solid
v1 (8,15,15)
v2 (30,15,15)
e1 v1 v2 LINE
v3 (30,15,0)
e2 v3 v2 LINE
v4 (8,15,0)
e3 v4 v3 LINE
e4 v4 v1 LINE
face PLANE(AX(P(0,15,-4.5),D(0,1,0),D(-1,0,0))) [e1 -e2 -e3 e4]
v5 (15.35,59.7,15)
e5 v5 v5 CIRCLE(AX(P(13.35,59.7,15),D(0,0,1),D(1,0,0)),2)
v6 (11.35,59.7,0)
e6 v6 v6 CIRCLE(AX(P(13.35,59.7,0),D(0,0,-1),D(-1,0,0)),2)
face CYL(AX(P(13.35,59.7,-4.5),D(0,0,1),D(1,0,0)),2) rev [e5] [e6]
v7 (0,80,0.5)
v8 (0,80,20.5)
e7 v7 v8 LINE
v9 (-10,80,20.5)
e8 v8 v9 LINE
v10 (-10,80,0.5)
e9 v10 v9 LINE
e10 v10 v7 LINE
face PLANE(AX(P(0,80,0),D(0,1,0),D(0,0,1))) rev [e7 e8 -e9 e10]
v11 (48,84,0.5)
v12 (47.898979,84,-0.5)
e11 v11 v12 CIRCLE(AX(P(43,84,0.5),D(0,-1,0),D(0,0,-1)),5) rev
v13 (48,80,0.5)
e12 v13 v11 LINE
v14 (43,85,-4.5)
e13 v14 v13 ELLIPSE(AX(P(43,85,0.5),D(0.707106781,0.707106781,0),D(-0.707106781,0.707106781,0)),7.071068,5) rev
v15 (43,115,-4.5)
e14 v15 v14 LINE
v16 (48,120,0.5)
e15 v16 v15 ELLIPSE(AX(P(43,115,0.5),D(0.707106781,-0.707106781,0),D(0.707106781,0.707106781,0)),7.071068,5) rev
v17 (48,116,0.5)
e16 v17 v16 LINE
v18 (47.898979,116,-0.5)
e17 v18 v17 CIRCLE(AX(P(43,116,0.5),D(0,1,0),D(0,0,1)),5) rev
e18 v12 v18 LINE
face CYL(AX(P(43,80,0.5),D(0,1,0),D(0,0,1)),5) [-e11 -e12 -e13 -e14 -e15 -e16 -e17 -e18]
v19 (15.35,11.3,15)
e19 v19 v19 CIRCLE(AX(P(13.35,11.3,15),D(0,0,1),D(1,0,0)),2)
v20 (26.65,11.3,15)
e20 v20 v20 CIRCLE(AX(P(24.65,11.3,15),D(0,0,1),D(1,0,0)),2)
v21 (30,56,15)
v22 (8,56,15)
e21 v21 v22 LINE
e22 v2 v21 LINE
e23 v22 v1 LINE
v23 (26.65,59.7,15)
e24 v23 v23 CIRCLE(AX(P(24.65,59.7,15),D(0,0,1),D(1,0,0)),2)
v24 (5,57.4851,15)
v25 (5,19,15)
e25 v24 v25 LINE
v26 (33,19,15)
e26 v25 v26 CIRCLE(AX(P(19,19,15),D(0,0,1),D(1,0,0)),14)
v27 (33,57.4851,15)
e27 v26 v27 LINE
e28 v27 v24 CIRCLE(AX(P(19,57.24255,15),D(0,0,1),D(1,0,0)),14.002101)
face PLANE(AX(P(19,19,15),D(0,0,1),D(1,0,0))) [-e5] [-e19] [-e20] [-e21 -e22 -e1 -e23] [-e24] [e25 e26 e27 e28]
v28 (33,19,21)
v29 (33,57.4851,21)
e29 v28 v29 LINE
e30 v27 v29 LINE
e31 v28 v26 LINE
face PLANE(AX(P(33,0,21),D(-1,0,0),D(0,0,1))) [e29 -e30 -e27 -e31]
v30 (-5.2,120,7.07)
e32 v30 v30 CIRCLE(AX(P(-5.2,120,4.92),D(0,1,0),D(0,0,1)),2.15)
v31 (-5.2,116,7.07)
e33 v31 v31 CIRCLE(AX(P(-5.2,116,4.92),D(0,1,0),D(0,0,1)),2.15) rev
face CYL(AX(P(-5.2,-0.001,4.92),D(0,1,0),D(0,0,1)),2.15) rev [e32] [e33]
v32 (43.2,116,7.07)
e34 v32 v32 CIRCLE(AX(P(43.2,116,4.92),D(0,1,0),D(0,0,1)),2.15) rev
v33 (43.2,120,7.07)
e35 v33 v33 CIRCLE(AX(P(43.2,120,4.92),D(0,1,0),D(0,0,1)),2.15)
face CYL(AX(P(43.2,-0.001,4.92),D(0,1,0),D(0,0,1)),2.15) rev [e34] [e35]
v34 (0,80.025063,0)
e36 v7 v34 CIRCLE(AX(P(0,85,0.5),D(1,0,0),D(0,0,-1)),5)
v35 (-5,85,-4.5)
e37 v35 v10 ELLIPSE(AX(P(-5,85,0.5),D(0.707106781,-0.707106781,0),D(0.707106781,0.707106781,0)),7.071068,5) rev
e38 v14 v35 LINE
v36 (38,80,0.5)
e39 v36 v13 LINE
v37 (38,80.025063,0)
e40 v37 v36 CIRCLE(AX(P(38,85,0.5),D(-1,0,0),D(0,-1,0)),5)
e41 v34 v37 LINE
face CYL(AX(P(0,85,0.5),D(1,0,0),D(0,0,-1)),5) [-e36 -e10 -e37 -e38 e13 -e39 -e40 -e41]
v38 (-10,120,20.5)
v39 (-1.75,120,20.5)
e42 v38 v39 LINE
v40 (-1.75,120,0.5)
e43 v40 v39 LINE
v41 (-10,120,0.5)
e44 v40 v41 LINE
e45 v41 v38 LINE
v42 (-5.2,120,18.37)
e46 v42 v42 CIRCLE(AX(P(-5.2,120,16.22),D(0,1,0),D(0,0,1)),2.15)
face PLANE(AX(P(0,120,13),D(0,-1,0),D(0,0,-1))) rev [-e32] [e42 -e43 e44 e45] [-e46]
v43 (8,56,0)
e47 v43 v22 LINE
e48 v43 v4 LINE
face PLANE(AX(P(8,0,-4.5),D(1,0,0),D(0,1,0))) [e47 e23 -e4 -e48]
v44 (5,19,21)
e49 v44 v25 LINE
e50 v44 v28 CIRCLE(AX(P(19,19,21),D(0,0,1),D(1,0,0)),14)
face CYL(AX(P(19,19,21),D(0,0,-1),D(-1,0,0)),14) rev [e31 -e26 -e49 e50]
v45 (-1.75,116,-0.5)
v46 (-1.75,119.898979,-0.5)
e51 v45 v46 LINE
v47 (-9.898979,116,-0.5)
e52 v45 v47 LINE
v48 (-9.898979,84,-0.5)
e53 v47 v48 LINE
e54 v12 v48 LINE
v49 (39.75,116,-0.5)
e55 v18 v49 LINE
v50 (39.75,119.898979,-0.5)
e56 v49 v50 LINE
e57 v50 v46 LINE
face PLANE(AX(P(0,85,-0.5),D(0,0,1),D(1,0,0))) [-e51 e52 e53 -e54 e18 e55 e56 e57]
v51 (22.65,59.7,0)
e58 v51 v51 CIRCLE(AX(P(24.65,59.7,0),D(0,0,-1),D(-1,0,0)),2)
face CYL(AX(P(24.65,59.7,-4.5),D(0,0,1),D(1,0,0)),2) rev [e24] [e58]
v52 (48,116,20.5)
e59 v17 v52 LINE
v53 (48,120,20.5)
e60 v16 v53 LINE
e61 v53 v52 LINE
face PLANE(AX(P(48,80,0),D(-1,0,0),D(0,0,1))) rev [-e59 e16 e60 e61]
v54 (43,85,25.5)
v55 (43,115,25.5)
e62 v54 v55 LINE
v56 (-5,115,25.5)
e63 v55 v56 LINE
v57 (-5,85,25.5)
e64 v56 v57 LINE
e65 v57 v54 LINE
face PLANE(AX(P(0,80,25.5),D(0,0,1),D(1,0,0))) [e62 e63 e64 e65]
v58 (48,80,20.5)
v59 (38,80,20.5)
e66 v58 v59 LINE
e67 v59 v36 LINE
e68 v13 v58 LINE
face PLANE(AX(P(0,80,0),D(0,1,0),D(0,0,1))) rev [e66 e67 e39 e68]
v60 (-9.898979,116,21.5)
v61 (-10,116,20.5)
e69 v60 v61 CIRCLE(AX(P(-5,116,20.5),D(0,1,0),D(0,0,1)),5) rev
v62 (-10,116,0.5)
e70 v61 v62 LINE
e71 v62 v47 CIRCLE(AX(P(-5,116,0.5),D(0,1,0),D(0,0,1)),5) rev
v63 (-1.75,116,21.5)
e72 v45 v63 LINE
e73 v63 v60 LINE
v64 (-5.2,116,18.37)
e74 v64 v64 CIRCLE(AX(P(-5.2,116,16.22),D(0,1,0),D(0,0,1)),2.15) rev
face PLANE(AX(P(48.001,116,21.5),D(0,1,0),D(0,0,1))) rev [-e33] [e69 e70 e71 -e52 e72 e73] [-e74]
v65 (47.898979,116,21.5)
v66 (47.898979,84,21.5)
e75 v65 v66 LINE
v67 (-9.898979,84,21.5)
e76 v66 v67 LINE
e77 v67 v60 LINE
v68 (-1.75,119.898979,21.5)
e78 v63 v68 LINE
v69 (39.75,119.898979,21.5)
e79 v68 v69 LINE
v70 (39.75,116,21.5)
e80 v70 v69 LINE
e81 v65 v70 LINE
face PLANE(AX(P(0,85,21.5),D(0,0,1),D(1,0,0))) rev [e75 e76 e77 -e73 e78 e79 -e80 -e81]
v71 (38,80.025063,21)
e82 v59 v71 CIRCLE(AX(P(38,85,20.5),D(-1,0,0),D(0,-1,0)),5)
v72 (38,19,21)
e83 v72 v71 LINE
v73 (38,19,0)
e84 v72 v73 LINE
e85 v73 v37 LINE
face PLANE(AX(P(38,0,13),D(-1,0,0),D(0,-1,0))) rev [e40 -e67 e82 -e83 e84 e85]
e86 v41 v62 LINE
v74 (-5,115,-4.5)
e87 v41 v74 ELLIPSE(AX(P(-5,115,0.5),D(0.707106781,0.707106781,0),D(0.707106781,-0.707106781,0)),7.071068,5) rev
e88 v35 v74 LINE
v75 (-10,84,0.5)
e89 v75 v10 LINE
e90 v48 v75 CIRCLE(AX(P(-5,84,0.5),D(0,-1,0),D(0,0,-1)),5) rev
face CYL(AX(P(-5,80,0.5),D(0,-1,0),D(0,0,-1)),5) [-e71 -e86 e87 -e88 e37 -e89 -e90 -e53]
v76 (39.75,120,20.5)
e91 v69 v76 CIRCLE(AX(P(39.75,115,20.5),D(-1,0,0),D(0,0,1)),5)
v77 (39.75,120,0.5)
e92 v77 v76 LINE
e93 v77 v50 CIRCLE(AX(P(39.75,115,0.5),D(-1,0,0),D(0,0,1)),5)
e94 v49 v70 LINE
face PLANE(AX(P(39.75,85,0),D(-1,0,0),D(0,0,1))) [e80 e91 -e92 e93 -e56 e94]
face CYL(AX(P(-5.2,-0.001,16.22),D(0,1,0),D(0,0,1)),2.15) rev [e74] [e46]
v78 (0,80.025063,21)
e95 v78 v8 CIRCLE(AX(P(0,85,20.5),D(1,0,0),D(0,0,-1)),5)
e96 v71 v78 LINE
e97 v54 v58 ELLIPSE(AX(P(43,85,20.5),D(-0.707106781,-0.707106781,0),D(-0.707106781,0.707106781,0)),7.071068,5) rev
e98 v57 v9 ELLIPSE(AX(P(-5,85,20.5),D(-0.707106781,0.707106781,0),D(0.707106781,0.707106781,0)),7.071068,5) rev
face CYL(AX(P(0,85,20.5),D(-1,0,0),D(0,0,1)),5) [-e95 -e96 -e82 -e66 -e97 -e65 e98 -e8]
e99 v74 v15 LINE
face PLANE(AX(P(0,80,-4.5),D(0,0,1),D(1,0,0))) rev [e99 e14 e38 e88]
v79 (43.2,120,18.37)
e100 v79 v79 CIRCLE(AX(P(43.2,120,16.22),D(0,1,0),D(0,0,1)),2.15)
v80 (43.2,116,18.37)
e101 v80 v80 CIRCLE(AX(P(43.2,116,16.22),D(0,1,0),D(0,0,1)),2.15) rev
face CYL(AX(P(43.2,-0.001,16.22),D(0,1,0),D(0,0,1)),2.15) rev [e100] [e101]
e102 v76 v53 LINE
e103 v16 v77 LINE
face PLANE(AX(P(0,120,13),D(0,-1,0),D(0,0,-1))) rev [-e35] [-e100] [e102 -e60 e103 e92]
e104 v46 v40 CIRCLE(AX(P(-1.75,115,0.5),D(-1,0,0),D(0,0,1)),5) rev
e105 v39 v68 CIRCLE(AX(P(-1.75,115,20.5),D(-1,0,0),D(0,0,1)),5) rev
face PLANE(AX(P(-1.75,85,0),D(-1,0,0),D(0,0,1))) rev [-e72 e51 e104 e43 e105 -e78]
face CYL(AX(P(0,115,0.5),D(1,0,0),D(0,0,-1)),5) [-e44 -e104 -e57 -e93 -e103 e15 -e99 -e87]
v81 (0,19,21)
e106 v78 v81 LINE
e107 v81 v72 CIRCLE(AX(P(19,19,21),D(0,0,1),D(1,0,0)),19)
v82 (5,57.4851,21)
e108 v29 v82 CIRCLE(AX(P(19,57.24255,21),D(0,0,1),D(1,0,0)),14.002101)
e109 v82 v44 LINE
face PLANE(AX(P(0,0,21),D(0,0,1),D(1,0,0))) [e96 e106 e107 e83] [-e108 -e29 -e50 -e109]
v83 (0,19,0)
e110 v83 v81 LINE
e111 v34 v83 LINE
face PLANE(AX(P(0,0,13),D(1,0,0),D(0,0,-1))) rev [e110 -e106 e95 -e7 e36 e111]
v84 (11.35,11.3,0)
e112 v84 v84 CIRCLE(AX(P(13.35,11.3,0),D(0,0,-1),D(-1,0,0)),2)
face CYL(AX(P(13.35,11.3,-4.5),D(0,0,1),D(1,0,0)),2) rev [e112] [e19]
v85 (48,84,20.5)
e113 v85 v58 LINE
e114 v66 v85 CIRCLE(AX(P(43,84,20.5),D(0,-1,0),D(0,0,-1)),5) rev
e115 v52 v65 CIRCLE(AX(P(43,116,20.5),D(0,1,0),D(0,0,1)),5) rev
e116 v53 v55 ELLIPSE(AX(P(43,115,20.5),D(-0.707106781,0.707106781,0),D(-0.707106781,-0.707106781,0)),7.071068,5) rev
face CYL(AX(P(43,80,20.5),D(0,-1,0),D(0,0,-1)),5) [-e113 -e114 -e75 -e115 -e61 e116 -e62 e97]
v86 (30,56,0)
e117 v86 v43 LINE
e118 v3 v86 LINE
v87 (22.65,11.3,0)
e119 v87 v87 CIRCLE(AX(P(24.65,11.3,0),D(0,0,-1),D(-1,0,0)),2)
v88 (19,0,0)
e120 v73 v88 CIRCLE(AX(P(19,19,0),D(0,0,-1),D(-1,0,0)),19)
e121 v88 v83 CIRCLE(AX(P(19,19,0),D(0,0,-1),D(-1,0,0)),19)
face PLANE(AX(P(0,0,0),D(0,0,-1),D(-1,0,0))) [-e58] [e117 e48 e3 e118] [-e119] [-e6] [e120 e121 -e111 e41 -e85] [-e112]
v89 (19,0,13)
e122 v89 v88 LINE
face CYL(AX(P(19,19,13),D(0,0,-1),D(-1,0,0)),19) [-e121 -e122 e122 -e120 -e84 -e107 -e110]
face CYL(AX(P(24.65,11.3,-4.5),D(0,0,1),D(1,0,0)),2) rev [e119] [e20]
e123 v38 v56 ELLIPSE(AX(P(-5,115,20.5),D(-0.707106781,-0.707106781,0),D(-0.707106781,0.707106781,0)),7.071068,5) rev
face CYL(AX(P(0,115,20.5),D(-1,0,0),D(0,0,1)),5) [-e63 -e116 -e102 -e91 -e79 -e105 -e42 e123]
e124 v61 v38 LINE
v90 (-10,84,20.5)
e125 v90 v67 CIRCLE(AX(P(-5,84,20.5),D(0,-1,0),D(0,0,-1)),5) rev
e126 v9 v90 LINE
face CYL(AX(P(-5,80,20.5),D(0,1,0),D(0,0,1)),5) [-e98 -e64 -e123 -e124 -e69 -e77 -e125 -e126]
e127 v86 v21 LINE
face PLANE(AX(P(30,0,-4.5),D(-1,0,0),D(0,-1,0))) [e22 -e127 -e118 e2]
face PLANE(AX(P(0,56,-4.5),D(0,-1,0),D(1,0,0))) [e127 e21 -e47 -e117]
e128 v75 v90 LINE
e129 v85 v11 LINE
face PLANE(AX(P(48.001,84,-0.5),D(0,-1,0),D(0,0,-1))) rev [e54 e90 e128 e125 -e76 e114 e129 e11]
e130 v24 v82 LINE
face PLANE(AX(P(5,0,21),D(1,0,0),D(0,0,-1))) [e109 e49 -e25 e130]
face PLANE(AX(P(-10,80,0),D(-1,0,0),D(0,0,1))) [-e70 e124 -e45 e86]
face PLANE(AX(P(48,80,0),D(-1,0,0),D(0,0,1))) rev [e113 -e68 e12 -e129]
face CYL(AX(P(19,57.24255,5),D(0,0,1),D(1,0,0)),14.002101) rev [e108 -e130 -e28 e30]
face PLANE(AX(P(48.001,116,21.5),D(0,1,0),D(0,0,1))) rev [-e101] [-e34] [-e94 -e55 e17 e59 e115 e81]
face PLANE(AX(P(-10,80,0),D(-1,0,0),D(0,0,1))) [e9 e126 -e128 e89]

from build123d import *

# Parameters (mm, degrees)
SKETCH1_W                = 38
SKETCH1_H                = 120
BOSS_EXTRUDE1_DEPTH      = 13
FILLET1_R                = 19
SKETCH2_W                = 28
SKETCH2_H                = 43
BOSS_EXTRUDE2_DEPTH      = 8
SKETCH4_W                = 58
SKETCH4_H                = 30
BOSS_EXTRUDE3_DEPTH      = 40
SKETCH4_2_W              = 41.5
SKETCH4_2_H              = 22
SKETCH4_2_W_2            = 38
SKETCH4_2_H_2            = 21
CUT_EXTRUDE2_DEPTH       = 35
CUT_EXTRUDE3_REACH       = 137.699
SKETCH5_W                = 22
SKETCH5_H                = 32
CUT_EXTRUDE4_REACH       = 133.736
SKETCH7_R                = 2.15
FILLET2_R                = 5
CUT_EXTRUDE5_START       = -8
CUT_EXTRUDE5_DEPTH       = 8
BOSS_EXTRUDE4_DEPTH      = 8
SKETCH9_W                = 22
SKETCH9_H                = 41
CUT_EXTRUDE20_DEPTH      = 131.859657649
CUT_EXTRUDE22_DEPTH      = 131.859657649
CUT_EXTRUDE22_DEPTH_BACK = 131.859657649
SKETCH11_R               = 2
SKETCH11_W               = 22
SKETCH11_H               = 41
SKETCH12_R               = 2
SKETCH12_W               = 22
SKETCH12_H               = 41
BOSS_EXTRUDE6_DEPTH      = 10


# Some blends are built 0.0001 mm under size
with BuildPart() as part:
    # Sketch1 → Boss-Extrude1 (new body)
    with BuildSketch(Plane.XY):
        with Locations((19, 60)):
            Rectangle(SKETCH1_W, SKETCH1_H)
    extrude(amount=BOSS_EXTRUDE1_DEPTH)

    # Fillet1
    fillet1_edges = [part.edges().sort_by_distance(p)[0] for p in [
        (38, 0, 6.5),
        (0, 0, 6.5),
    ]]
    fillet(fillet1_edges, radius=FILLET1_R - 0.0001)  # a hair under: the kernel refuses the full size

    # Sketch2 → Boss-Extrude2 (add)
    with BuildSketch(Plane.XY.offset(13)):
        with BuildLine():
            Line((33, 72), (33, 19))
            ThreePointArc((33, 19), (28.899494937, 9.100505063), (19, 5))
            ThreePointArc((19, 5), (9.100505063, 9.100505063), (5, 19))
            Line((5, 19), (5, 72))
            Line((5, 72), (0, 72))
            Line((0, 72), (0, 19))
            ThreePointArc((0, 19), (5.564971157, 5.564971157), (19, 0))
            ThreePointArc((19, 0), (32.435028843, 5.564971157), (38, 19))
            Line((38, 19), (38, 72))
            Line((38, 72), (33, 72))
        make_face()
        Polygon((33, 115), (33, 72), (38, 72), (38, 120), (0, 120), (0, 72), (5, 72), (5, 115), align=None)
        with Locations((19, 93.5)):
            Rectangle(SKETCH2_W, SKETCH2_H)
    extrude(amount=BOSS_EXTRUDE2_DEPTH)

    # Sketch4 → Boss-Extrude3 (add)
    with BuildSketch(Plane(origin=(0, 120, 0), x_dir=(1, 0, 0), z_dir=(0, 1, 0))):
        with Locations((19, -10.5)):
            Rectangle(SKETCH4_W, SKETCH4_H)
    extrude(amount=-BOSS_EXTRUDE3_DEPTH)

    # Sketch4<2> → Cut-Extrude2 (cut)
    # profile 1 of 2: a face of its own
    with BuildSketch(Plane(origin=(0, 120, 0), x_dir=(1, 0, 0), z_dir=(0, 1, 0))):
        with Locations((19, -10.5)):
            Rectangle(SKETCH4_2_W, SKETCH4_2_H)
        with Locations((19, -10.5)):
            Rectangle(SKETCH4_2_W_2, SKETCH4_2_H_2, mode=Mode.SUBTRACT)
    # profile 2 of 2: a face of its own
    with BuildSketch(Plane(origin=(0, 120, 0), x_dir=(1, 0, 0), z_dir=(0, 1, 0))):
        with Locations((19, -10.5)):
            Rectangle(SKETCH4_2_W_2, SKETCH4_2_H_2)
    extrude(amount=-CUT_EXTRUDE2_DEPTH, mode=Mode.SUBTRACT)

    # Sketch5 → Cut-Extrude3 (cut, up to next)
    with BuildSketch(Plane.ZY.offset(10), mode=Mode.PRIVATE) as cut_extrude3_sk1:
        with Locations((10.5, 100)):
            Rectangle(SKETCH5_W, SKETCH5_H)
    cut_extrude3_tool1 = extrude(cut_extrude3_sk1.sketch, amount=-CUT_EXTRUDE3_REACH, mode=Mode.PRIVATE) & part.part
    add(cut_extrude3_tool1.solids().sort_by_distance((-10, 100, 10.5))[0], mode=Mode.SUBTRACT)

    # Sketch7 → Cut-Extrude4 (cut, up to next)
    with BuildSketch(Plane(origin=(0, 120, 0), x_dir=(1, 0, 0), z_dir=(0, 1, 0)), mode=Mode.PRIVATE) as cut_extrude4_sk1:
        with Locations(Location((-5.2, -4.92, 0), (0, 0, 270))):
            Circle(SKETCH7_R)
    cut_extrude4_tool1 = extrude(cut_extrude4_sk1.sketch, amount=-CUT_EXTRUDE4_REACH, mode=Mode.PRIVATE) & part.part
    # Sketch7 → Cut-Extrude4 (cut, up to next)
    with BuildSketch(Plane(origin=(0, 120, 0), x_dir=(1, 0, 0), z_dir=(0, 1, 0)), mode=Mode.PRIVATE) as cut_extrude4_sk2:
        with Locations(Location((-5.2, -16.22, 0), (0, 0, 270))):
            Circle(SKETCH7_R)
    cut_extrude4_tool2 = extrude(cut_extrude4_sk2.sketch, amount=-CUT_EXTRUDE4_REACH, mode=Mode.PRIVATE) & part.part
    # Sketch7 → Cut-Extrude4 (cut, up to next)
    with BuildSketch(Plane(origin=(0, 120, 0), x_dir=(1, 0, 0), z_dir=(0, 1, 0)), mode=Mode.PRIVATE) as cut_extrude4_sk3:
        with Locations(Location((43.2, -4.92, 0), (0, 0, 270))):
            Circle(SKETCH7_R)
    cut_extrude4_tool3 = extrude(cut_extrude4_sk3.sketch, amount=-CUT_EXTRUDE4_REACH, mode=Mode.PRIVATE) & part.part
    # Sketch7 → Cut-Extrude4 (cut, up to next)
    with BuildSketch(Plane(origin=(0, 120, 0), x_dir=(1, 0, 0), z_dir=(0, 1, 0)), mode=Mode.PRIVATE) as cut_extrude4_sk4:
        with Locations(Location((43.2, -16.22, 0), (0, 0, 270))):
            Circle(SKETCH7_R)
    cut_extrude4_tool4 = extrude(cut_extrude4_sk4.sketch, amount=-CUT_EXTRUDE4_REACH, mode=Mode.PRIVATE) & part.part
    # Sketch7 → Cut-Extrude4 (cut, up to next)
    with BuildSketch(Plane(origin=(0, 120, 0), x_dir=(1, 0, 0), z_dir=(0, 1, 0)), mode=Mode.PRIVATE) as cut_extrude4_sk5:
        with Locations(Location((-5.2, -4.92, 0), (0, 0, 270))):
            Circle(SKETCH7_R)
    cut_extrude4_tool5 = extrude(cut_extrude4_sk5.sketch, amount=-CUT_EXTRUDE4_REACH, mode=Mode.PRIVATE) & part.part
    add(cut_extrude4_tool1.solids().sort_by_distance((-5.2, 120, 4.92))[0], mode=Mode.SUBTRACT)
    add(cut_extrude4_tool2.solids().sort_by_distance((-5.2, 120, 16.22))[0], mode=Mode.SUBTRACT)
    add(cut_extrude4_tool3.solids().sort_by_distance((43.2, 120, 4.92))[0], mode=Mode.SUBTRACT)
    add(cut_extrude4_tool4.solids().sort_by_distance((43.2, 120, 16.22))[0], mode=Mode.SUBTRACT)
    add(cut_extrude4_tool5.solids().sort_by_distance((-5.2, 120, 4.92))[0], mode=Mode.SUBTRACT)

    # Fillet2
    # the kernel refuses this fillet: 5 mm, written as the material it takes off along each edge
    with BuildSketch(Plane(origin=(-10, 132.5, -4.5), x_dir=(1, 0, 0), z_dir=(0, -1, 0)), Plane(origin=(-10, 132.5, 25.5), x_dir=(0, 0, -1), z_dir=(0, -1, 0))) as fillet2_piece_1:
        with BuildLine():
            CenterArc((FILLET2_R, FILLET2_R), FILLET2_R, 180, 90)
            Line((0, FILLET2_R), (0, 0))
            Line((0, 0), (FILLET2_R, 0))
        make_face()
    extrude(amount=65, mode=Mode.SUBTRACT)
    with BuildSketch(Plane(origin=(-22.5, 120, -4.5), x_dir=(0, -1, 0), z_dir=(1, 0, 0)), Plane(origin=(60.5, 120, 25.5), x_dir=(0, -1, 0), z_dir=(-1, 0, 0))) as fillet2_piece_2:
        with BuildLine():
            CenterArc((FILLET2_R, -FILLET2_R), FILLET2_R, 90, 90)
            Line((0, -FILLET2_R), (0, 0))
            Line((0, 0), (FILLET2_R, 0))
        make_face()
    extrude(amount=83, mode=Mode.SUBTRACT)
    with BuildSketch(Plane(origin=(-22.5, 80, -4.5), x_dir=(0, 0, 1), z_dir=(1, 0, 0))) as fillet2_piece_3_section:
        with BuildLine():
            CenterArc((FILLET2_R, -FILLET2_R), FILLET2_R, 90, 90)
            Line((0, -FILLET2_R), (0, 0))
            Line((0, 0), (FILLET2_R, 0))
        make_face()
    fillet2_piece_3 = extrude(amount=83, mode=Mode.PRIVATE)
    fillet2_piece_3 = split(fillet2_piece_3, bisect_by=Plane(origin=(-11.25, 79.954430424, 0), z_dir=(0, 0, 1)), keep=Keep.TOP, mode=Mode.PRIVATE)
    fillet2_piece_3 = split(fillet2_piece_3, bisect_by=Plane(origin=(0, 79.954430424, 0.240366423), z_dir=(-1, 0, 0)), keep=Keep.TOP, mode=Mode.PRIVATE)
    add(fillet2_piece_3, mode=Mode.SUBTRACT)
    with BuildSketch(Plane(origin=(-22.5, 80, -4.5), x_dir=(0, 0, 1), z_dir=(1, 0, 0))) as fillet2_piece_4_section:
        with BuildLine():
            CenterArc((FILLET2_R, -FILLET2_R), FILLET2_R, 90, 90)
            Line((0, -FILLET2_R), (0, 0))
            Line((0, 0), (FILLET2_R, 0))
        make_face()
    fillet2_piece_4 = extrude(amount=83, mode=Mode.PRIVATE)
    fillet2_piece_4 = split(fillet2_piece_4, bisect_by=Plane(origin=(-11.25, 81.142067703, 0), z_dir=(0, 0, -1)), keep=Keep.TOP, mode=Mode.PRIVATE)
    fillet2_piece_4 = split(fillet2_piece_4, bisect_by=Plane(origin=(0, 81.142067703, -3.398950084), z_dir=(-1, 0, 0)), keep=Keep.TOP, mode=Mode.PRIVATE)
    add(fillet2_piece_4, mode=Mode.SUBTRACT)
    with BuildSketch(Plane(origin=(-22.5, 80, -4.5), x_dir=(0, 0, 1), z_dir=(1, 0, 0))) as fillet2_piece_5_section:
        with BuildLine():
            CenterArc((FILLET2_R, -FILLET2_R), FILLET2_R, 90, 90)
            Line((0, -FILLET2_R), (0, 0))
            Line((0, 0), (FILLET2_R, 0))
        make_face()
    fillet2_piece_5 = extrude(amount=83, mode=Mode.PRIVATE)
    fillet2_piece_5 = split(fillet2_piece_5, bisect_by=Plane(origin=(19, 81.142067703, 0), z_dir=(0, 0, -1)), keep=Keep.TOP, mode=Mode.PRIVATE)
    fillet2_piece_5 = split(fillet2_piece_5, bisect_by=Plane(origin=(0, 81.142067703, -3.398950084), z_dir=(1, 0, 0)), keep=Keep.TOP, mode=Mode.PRIVATE)
    fillet2_piece_5 = split(fillet2_piece_5, bisect_by=Plane(origin=(38, 81.142067703, -3.398950084), z_dir=(-1, 0, 0)), keep=Keep.TOP, mode=Mode.PRIVATE)
    add(fillet2_piece_5, mode=Mode.SUBTRACT)
    with BuildSketch(Plane(origin=(-22.5, 80, -4.5), x_dir=(0, 0, 1), z_dir=(1, 0, 0))) as fillet2_piece_6_section:
        with BuildLine():
            CenterArc((FILLET2_R, -FILLET2_R), FILLET2_R, 90, 90)
            Line((0, -FILLET2_R), (0, 0))
            Line((0, 0), (FILLET2_R, 0))
        make_face()
    fillet2_piece_6 = extrude(amount=83, mode=Mode.PRIVATE)
    fillet2_piece_6 = split(fillet2_piece_6, bisect_by=Plane(origin=(49.25, 79.954430424, 0), z_dir=(0, 0, 1)), keep=Keep.TOP, mode=Mode.PRIVATE)
    fillet2_piece_6 = split(fillet2_piece_6, bisect_by=Plane(origin=(38, 79.954430424, 0.240366423), z_dir=(1, 0, 0)), keep=Keep.TOP, mode=Mode.PRIVATE)
    add(fillet2_piece_6, mode=Mode.SUBTRACT)
    with BuildSketch(Plane(origin=(-22.5, 80, -4.5), x_dir=(0, 0, 1), z_dir=(1, 0, 0))) as fillet2_piece_7_section:
        with BuildLine():
            CenterArc((FILLET2_R, -FILLET2_R), FILLET2_R, 90, 90)
            Line((0, -FILLET2_R), (0, 0))
            Line((0, 0), (FILLET2_R, 0))
        make_face()
    fillet2_piece_7 = extrude(amount=83, mode=Mode.PRIVATE)
    fillet2_piece_7 = split(fillet2_piece_7, bisect_by=Plane(origin=(49.25, 81.142067703, 0), z_dir=(0, 0, -1)), keep=Keep.TOP, mode=Mode.PRIVATE)
    fillet2_piece_7 = split(fillet2_piece_7, bisect_by=Plane(origin=(38, 81.142067703, -3.398950084), z_dir=(1, 0, 0)), keep=Keep.TOP, mode=Mode.PRIVATE)
    add(fillet2_piece_7, mode=Mode.SUBTRACT)
    with BuildSketch(Plane(origin=(48, 132.5, -4.5), x_dir=(-1, 0, 0), z_dir=(0, -1, 0)), Plane(origin=(48, 132.5, 25.5), x_dir=(0, 0, -1), z_dir=(0, -1, 0))) as fillet2_piece_8:
        with BuildLine():
            CenterArc((FILLET2_R, -FILLET2_R), FILLET2_R, 90, 90)
            Line((0, -FILLET2_R), (0, 0))
            Line((0, 0), (FILLET2_R, 0))
        make_face()
    extrude(amount=65, mode=Mode.SUBTRACT)
    with BuildSketch(Plane(origin=(60.5, 80, 25.5), x_dir=(0, 0, -1), z_dir=(-1, 0, 0))) as fillet2_piece_9_section:
        with BuildLine():
            CenterArc((FILLET2_R, -FILLET2_R), FILLET2_R, 90, 90)
            Line((0, -FILLET2_R), (0, 0))
            Line((0, 0), (FILLET2_R, 0))
        make_face()
    fillet2_piece_9 = extrude(amount=83, mode=Mode.PRIVATE)
    fillet2_piece_9 = split(fillet2_piece_9, bisect_by=Plane(origin=(38, 79.954430424, 20.759633577), z_dir=(1, 0, 0)), keep=Keep.TOP, mode=Mode.PRIVATE)
    fillet2_piece_9 = split(fillet2_piece_9, bisect_by=Plane(origin=(49.25, 79.954430424, 21), z_dir=(0, 0, -1)), keep=Keep.TOP, mode=Mode.PRIVATE)
    add(fillet2_piece_9, mode=Mode.SUBTRACT)
    with BuildSketch(Plane(origin=(60.5, 80, 25.5), x_dir=(0, 0, -1), z_dir=(-1, 0, 0))) as fillet2_piece_10_section:
        with BuildLine():
            CenterArc((FILLET2_R, -FILLET2_R), FILLET2_R, 90, 90)
            Line((0, -FILLET2_R), (0, 0))
            Line((0, 0), (FILLET2_R, 0))
        make_face()
    fillet2_piece_10 = extrude(amount=83, mode=Mode.PRIVATE)
    fillet2_piece_10 = split(fillet2_piece_10, bisect_by=Plane(origin=(38, 81.142067703, 24.398950084), z_dir=(1, 0, 0)), keep=Keep.TOP, mode=Mode.PRIVATE)
    fillet2_piece_10 = split(fillet2_piece_10, bisect_by=Plane(origin=(49.25, 81.142067703, 21), z_dir=(0, 0, 1)), keep=Keep.TOP, mode=Mode.PRIVATE)
    add(fillet2_piece_10, mode=Mode.SUBTRACT)
    with BuildSketch(Plane(origin=(60.5, 80, 25.5), x_dir=(0, 0, -1), z_dir=(-1, 0, 0))) as fillet2_piece_11_section:
        with BuildLine():
            CenterArc((FILLET2_R, -FILLET2_R), FILLET2_R, 90, 90)
            Line((0, -FILLET2_R), (0, 0))
            Line((0, 0), (FILLET2_R, 0))
        make_face()
    fillet2_piece_11 = extrude(amount=83, mode=Mode.PRIVATE)
    fillet2_piece_11 = split(fillet2_piece_11, bisect_by=Plane(origin=(0, 81.142067703, 24.398950084), z_dir=(1, 0, 0)), keep=Keep.TOP, mode=Mode.PRIVATE)
    fillet2_piece_11 = split(fillet2_piece_11, bisect_by=Plane(origin=(38, 81.142067703, 24.398950084), z_dir=(-1, 0, 0)), keep=Keep.TOP, mode=Mode.PRIVATE)
    fillet2_piece_11 = split(fillet2_piece_11, bisect_by=Plane(origin=(19, 81.142067703, 21), z_dir=(0, 0, 1)), keep=Keep.TOP, mode=Mode.PRIVATE)
    add(fillet2_piece_11, mode=Mode.SUBTRACT)
    with BuildSketch(Plane(origin=(60.5, 80, 25.5), x_dir=(0, 0, -1), z_dir=(-1, 0, 0))) as fillet2_piece_12_section:
        with BuildLine():
            CenterArc((FILLET2_R, -FILLET2_R), FILLET2_R, 90, 90)
            Line((0, -FILLET2_R), (0, 0))
            Line((0, 0), (FILLET2_R, 0))
        make_face()
    fillet2_piece_12 = extrude(amount=83, mode=Mode.PRIVATE)
    fillet2_piece_12 = split(fillet2_piece_12, bisect_by=Plane(origin=(0, 79.954430424, 20.759633577), z_dir=(-1, 0, 0)), keep=Keep.TOP, mode=Mode.PRIVATE)
    fillet2_piece_12 = split(fillet2_piece_12, bisect_by=Plane(origin=(-11.25, 79.954430424, 21), z_dir=(0, 0, -1)), keep=Keep.TOP, mode=Mode.PRIVATE)
    add(fillet2_piece_12, mode=Mode.SUBTRACT)
    with BuildSketch(Plane(origin=(60.5, 80, 25.5), x_dir=(0, 0, -1), z_dir=(-1, 0, 0))) as fillet2_piece_13_section:
        with BuildLine():
            CenterArc((FILLET2_R, -FILLET2_R), FILLET2_R, 90, 90)
            Line((0, -FILLET2_R), (0, 0))
            Line((0, 0), (FILLET2_R, 0))
        make_face()
    fillet2_piece_13 = extrude(amount=83, mode=Mode.PRIVATE)
    fillet2_piece_13 = split(fillet2_piece_13, bisect_by=Plane(origin=(0, 81.142067703, 24.398950084), z_dir=(-1, 0, 0)), keep=Keep.TOP, mode=Mode.PRIVATE)
    fillet2_piece_13 = split(fillet2_piece_13, bisect_by=Plane(origin=(-11.25, 81.142067703, 21), z_dir=(0, 0, 1)), keep=Keep.TOP, mode=Mode.PRIVATE)
    add(fillet2_piece_13, mode=Mode.SUBTRACT)

    # Sketch3<3> → Cut-Extrude5 (cut)
    with BuildSketch(Plane.XY.offset(13).offset(CUT_EXTRUDE5_START)):
        with BuildLine():
            Line((5, 57.485100075), (5, 57))
            Line((5, 57), (5, 19))
            ThreePointArc((5, 19), (19, 5), (33, 19))
            Line((33, 19), (33, 57))
            Line((33, 57), (33, 57.485100075))
            ThreePointArc((33, 57.485100075), (19, 71.24465097), (5, 57.485100075))
        make_face()
    extrude(amount=CUT_EXTRUDE5_DEPTH, mode=Mode.SUBTRACT)

    # Sketch3 → Boss-Extrude4 (add)
    with BuildSketch(Plane.XY.offset(13)):
        with BuildLine():
            Line((5, 72), (5, 57.485100075))
            ThreePointArc((5, 57.485100075), (19, 71.24465097), (33, 57.485100075))
            Line((33, 57.485100075), (33, 72))
            Line((33, 72), (5, 72))
        make_face()
    extrude(amount=BOSS_EXTRUDE4_DEPTH)

    # Sketch9 → Cut-Extrude20 (cut, through all)
    with BuildSketch(Plane.XY.offset(5)):
        with Locations((19, 35.5)):
            Rectangle(SKETCH9_W, SKETCH9_H)
        with BuildLine():
            Line((11.609906409, 27.348861392), (11.609906409, 26.503403734))
            ThreePointArc((11.609906409, 26.503403734), (13.879652291, 15.001207086), (16.608900022, 26.403113985))
            Line((16.608900022, 26.403113985), (16.608900022, 27.248571642))
            ThreePointArc((16.608900022, 27.248571642), (14.159570107, 29.799310765), (11.609906409, 27.348861392))
        make_face(mode=Mode.SUBTRACT)
    extrude(amount=-CUT_EXTRUDE20_DEPTH, mode=Mode.SUBTRACT)


with BuildPart() as cut_extrude20_kept_piece:
    # of the separate pieces the step leaves, the one the design keeps (cut_extrude20_pieces_kept)
    add(part.part.solids().sort_by_distance((18.9999, 0, 0))[0])

    # Sketch11 → Cut-Extrude22 (cut, two sides: drawn at the far end of the back side and taken through both)
    with BuildSketch(Plane.XY.offset(5).offset(-CUT_EXTRUDE22_DEPTH_BACK)):
        with Locations((13.35, 59.7)):
            Circle(SKETCH11_R)
        with Locations((24.65, 59.7)):
            Circle(SKETCH11_R)
        with Locations((24.65, 11.3)):
            Circle(SKETCH11_R)
        with Locations((13.35, 11.3)):
            Circle(SKETCH11_R)
        with Locations((19, 35.5)):
            Rectangle(SKETCH11_W, SKETCH11_H)
    extrude(amount=CUT_EXTRUDE22_DEPTH + CUT_EXTRUDE22_DEPTH_BACK, mode=Mode.SUBTRACT)

    # Sketch12 → Boss-Extrude6 (add)
    with BuildSketch(Plane.XY.offset(5)):
        with BuildLine():
            Line((33, 19), (33, 57.485100075))
            ThreePointArc((33, 57.485100075), (19, 71.24465097), (5, 57.485100075))
            Line((5, 57.485100075), (5, 19))
            ThreePointArc((5, 19), (19, 5), (33, 19))
        make_face()
        with Locations((24.65, 11.3)):
            Circle(SKETCH12_R, mode=Mode.SUBTRACT)
        with Locations((13.35, 11.3)):
            Circle(SKETCH12_R, mode=Mode.SUBTRACT)
        with Locations((13.35, 59.7)):
            Circle(SKETCH12_R, mode=Mode.SUBTRACT)
        with Locations((24.65, 59.7)):
            Circle(SKETCH12_R, mode=Mode.SUBTRACT)
        with Locations((19, 35.5)):
            Rectangle(SKETCH12_W, SKETCH12_H, mode=Mode.SUBTRACT)
    extrude(amount=BOSS_EXTRUDE6_DEPTH)


solid = cut_extrude20_kept_piece.part
